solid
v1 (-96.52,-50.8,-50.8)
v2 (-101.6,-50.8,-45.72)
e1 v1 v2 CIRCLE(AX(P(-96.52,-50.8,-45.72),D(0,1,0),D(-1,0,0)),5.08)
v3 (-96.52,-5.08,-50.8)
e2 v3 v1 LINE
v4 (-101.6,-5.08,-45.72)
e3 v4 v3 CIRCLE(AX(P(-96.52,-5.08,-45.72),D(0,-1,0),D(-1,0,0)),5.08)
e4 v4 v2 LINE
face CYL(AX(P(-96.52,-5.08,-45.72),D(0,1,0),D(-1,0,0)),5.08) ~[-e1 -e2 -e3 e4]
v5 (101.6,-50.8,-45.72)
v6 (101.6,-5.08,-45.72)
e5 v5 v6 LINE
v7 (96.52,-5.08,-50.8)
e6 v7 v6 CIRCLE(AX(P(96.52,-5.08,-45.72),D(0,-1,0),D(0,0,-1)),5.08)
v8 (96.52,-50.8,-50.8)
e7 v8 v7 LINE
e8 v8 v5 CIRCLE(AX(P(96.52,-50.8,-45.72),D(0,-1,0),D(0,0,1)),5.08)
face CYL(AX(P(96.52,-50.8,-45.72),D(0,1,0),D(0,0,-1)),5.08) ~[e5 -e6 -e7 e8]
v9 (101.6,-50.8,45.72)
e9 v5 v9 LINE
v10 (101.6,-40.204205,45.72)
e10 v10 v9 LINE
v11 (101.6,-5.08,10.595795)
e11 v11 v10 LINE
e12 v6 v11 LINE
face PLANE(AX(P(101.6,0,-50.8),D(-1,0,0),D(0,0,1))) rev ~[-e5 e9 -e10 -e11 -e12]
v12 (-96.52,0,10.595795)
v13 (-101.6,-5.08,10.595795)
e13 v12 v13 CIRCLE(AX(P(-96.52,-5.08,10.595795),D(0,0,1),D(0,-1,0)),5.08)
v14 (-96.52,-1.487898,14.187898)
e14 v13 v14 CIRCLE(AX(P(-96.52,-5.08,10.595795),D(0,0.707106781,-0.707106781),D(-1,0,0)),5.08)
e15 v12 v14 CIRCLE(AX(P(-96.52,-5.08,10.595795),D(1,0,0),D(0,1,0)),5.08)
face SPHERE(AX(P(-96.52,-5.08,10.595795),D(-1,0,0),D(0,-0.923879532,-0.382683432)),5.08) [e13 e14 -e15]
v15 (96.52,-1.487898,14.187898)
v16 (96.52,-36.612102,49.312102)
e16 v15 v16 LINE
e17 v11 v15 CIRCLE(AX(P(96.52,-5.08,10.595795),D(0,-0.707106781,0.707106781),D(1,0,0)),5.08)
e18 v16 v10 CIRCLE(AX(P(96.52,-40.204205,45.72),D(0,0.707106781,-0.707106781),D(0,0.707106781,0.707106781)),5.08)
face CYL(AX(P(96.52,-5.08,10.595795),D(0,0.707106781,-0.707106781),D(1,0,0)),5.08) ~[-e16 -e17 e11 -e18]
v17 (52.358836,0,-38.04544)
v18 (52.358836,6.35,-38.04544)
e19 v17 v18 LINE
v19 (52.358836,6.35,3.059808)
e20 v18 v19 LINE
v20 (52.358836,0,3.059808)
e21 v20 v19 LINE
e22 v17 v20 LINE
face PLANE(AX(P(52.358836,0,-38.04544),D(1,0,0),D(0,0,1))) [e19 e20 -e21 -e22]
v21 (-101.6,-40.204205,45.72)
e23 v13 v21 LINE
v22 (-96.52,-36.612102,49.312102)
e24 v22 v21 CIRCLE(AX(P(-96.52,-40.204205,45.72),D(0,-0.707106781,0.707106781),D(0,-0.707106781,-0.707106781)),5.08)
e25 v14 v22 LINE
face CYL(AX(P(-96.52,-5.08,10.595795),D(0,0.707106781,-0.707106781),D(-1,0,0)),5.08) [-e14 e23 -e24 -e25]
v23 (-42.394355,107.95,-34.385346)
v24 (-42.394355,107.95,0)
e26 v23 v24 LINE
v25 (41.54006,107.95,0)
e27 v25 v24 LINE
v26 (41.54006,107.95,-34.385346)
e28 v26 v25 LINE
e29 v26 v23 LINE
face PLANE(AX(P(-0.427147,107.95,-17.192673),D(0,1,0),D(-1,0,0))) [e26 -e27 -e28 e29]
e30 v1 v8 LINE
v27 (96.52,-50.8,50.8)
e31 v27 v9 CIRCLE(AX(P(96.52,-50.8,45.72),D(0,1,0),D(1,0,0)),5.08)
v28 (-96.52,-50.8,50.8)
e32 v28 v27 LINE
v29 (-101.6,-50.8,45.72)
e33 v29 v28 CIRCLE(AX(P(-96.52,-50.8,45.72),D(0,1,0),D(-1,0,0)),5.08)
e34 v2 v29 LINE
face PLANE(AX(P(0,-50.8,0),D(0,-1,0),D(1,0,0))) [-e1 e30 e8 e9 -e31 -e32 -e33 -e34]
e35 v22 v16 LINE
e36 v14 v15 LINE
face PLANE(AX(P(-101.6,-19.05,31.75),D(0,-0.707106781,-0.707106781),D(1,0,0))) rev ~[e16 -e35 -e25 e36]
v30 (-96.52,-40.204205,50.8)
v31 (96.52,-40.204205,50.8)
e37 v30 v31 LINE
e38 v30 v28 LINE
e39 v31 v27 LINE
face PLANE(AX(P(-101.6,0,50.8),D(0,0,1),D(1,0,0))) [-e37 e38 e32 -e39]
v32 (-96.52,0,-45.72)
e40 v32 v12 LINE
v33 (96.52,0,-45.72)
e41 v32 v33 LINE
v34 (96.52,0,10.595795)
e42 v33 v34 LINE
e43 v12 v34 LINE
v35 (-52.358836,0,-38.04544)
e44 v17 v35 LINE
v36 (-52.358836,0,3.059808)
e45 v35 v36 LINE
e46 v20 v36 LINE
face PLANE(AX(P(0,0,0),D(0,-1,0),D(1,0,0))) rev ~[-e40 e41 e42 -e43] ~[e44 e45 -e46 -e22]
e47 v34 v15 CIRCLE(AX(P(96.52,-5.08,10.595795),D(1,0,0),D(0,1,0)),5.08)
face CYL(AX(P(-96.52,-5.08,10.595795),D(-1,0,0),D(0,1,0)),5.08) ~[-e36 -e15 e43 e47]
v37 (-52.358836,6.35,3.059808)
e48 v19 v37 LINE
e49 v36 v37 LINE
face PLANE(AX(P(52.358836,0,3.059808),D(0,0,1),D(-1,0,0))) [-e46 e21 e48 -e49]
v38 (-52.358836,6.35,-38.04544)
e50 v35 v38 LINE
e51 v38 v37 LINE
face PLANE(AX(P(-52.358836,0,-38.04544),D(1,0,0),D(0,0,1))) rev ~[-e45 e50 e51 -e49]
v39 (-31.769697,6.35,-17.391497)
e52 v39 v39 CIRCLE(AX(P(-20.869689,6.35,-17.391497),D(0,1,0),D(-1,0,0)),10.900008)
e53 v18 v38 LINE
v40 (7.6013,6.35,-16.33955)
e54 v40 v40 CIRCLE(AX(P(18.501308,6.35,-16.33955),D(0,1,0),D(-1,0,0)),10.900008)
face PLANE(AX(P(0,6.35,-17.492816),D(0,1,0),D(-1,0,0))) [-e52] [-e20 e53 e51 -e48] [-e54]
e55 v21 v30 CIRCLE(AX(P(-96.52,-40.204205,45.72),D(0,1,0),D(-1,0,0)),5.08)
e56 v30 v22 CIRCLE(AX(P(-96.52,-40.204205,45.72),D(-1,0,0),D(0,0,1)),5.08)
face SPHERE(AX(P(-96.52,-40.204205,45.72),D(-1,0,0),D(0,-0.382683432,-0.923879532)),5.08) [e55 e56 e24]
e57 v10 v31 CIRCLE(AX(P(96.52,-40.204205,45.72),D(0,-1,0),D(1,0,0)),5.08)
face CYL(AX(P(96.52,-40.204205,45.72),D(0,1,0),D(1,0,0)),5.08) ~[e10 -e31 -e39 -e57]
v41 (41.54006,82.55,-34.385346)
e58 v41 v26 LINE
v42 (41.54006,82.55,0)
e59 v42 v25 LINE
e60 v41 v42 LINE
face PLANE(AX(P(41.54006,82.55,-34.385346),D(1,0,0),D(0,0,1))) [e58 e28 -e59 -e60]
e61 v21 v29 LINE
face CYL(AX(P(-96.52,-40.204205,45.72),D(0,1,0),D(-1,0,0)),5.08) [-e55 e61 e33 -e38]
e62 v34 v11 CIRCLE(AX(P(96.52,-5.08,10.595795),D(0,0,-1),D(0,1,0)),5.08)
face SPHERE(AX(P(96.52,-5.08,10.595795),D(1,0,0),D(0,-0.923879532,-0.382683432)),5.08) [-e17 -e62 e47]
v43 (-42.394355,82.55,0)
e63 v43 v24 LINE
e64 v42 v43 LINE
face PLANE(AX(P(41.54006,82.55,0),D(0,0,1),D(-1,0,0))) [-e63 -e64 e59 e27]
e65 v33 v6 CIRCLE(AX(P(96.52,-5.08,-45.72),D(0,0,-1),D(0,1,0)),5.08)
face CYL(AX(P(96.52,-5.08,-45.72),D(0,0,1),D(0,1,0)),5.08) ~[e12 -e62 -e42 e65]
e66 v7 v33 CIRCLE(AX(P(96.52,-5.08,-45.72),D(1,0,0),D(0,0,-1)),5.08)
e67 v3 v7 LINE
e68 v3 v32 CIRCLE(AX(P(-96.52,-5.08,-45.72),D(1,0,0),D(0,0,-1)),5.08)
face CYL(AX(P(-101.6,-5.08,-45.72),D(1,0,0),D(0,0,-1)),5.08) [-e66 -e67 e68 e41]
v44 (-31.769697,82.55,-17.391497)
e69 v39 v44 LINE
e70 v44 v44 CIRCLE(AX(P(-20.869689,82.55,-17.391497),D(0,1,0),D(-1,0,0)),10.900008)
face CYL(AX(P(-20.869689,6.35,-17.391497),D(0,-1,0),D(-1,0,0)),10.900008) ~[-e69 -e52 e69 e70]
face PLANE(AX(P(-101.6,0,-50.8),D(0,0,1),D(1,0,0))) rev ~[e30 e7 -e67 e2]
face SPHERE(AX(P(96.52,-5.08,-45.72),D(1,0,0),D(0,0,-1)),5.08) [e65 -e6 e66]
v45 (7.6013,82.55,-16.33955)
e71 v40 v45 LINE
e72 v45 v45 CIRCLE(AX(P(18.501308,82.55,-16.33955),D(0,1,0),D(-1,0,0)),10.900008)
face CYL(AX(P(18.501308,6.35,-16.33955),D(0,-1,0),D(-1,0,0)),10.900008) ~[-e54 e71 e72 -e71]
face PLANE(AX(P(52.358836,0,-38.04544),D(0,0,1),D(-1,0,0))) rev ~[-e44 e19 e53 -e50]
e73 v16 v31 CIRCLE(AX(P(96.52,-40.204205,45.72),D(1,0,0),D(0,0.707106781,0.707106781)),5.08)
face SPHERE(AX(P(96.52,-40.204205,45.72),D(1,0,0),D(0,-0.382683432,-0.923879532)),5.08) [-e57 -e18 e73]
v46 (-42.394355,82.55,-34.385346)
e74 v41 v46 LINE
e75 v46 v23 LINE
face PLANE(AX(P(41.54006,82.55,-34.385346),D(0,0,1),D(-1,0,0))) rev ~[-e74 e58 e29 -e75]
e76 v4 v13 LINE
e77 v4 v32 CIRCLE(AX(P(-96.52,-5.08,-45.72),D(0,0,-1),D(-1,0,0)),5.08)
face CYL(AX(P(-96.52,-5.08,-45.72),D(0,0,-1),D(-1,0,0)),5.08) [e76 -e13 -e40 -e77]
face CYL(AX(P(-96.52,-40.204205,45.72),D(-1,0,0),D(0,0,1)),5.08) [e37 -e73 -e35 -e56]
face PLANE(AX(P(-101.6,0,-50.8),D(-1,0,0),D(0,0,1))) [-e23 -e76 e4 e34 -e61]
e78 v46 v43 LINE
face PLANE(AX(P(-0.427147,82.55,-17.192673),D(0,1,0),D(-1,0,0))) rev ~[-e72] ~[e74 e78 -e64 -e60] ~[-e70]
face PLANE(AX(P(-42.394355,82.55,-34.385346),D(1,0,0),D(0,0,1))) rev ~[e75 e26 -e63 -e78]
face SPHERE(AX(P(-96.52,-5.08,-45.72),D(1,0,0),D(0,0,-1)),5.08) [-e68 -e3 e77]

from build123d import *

# Parameters (mm, degrees)
F0_W         = 203.2
F0_H         = 101.6
F1_DEPTH     = 50.8
F2_R         = 5.08
F3_SIZE      = 38.1
F4_T1_DEPTH  = 71.12
F4_T3_DEPTH  = 58.42
F4_T6_ANGLE  = 90
F5_R         = 5.08
F6_T1_DEPTH  = 64.4773318296
F6_T3_DEPTH  = 193.04
F6_T8_DEPTH  = 5.08
F6_T14_DEPTH = 5.08
F7_T1_DEPTH  = 193.04
F7_T3_DEPTH  = 23.2957951031
F7_T8_DEPTH  = 5.08
F7_T14_DEPTH = 5.08
F8_W         = 104.7176718712
F8_H         = 41.105248034
F9_DEPTH     = 6.35
F10_R        = 10.900008085
F11_DEPTH    = 76.2
F12_W        = 83.9344151318
F12_H        = 34.3853458762
F13_DEPTH    = 25.4


# Not quite as in the source:
# - a fillet or chamfer that OpenCascade refuses, or shapes differently, is made with other operations: its cross-section is extruded or revolved along the edge and cut away or added


with BuildPart() as f1:
    # F0 (on Front) → F1 (new body)
    with BuildSketch(Plane.XZ):
        Rectangle(F0_W, F0_H)
    extrude(amount=F1_DEPTH)

    # F2
    f2_edges = [f1.edges().sort_by_distance(p)[0] for p in [
        (0, 0, -50.8),
    ]]
    fillet(f2_edges, radius=F2_R)

    # F3
    f3_edges = [f1.edges().sort_by_distance(p)[0] for p in [
        (0, 0, 50.8),
    ]]
    chamfer(f3_edges, length=F3_SIZE)

    # F4: fillet of radius 5.08 on 1 edges, made by hand

    # F4_s2 → F4_t1 (cut)
    with BuildSketch(Plane.XY.offset(-45.72)):
        with BuildLine():
            ThreePointArc((-101.6, -5.08), (-100.1121024484, -1.4878975516), (-96.52, 0))
            Line((-96.52, 0), (-101.6, 0))
            Line((-101.6, 0), (-101.6, -5.08))
        make_face()
    extrude(amount=F4_T1_DEPTH, mode=Mode.SUBTRACT)

    # F4_s4 → F4_t3 (cut)
    with BuildSketch(Plane.XZ.offset(5.08)):
        with BuildLine():
            ThreePointArc((-101.6, -45.72), (-100.1121024484, -49.3121024484), (-96.52, -50.8))
            Line((-96.52, -50.8), (-101.6, -50.8))
            Line((-101.6, -50.8), (-101.6, -45.72))
        make_face()
    extrude(amount=F4_T3_DEPTH, mode=Mode.SUBTRACT)

    # F4_s5 → F4_t6 (revolve, cut)
    with BuildSketch(Plane.XZ.offset(5.08)):
        with BuildLine():
            ThreePointArc((-101.6, -45.72), (-100.1121024484, -49.3121024484), (-96.52, -50.8))
            Line((-96.52, -50.8), (-101.6, -50.8))
            Line((-101.6, -50.8), (-101.6, -45.72))
        make_face()
    revolve(axis=Axis((-101.6, -5.08, -45.72), (1, 0, 0)), revolution_arc=F4_T6_ANGLE, mode=Mode.SUBTRACT)

    # F5
    f5_edges = [f1.edges().sort_by_distance(p)[0] for p in [
        (101.6, 0, -16.51),
    ]]
    fillet(f5_edges, radius=F5_R)

    # F6: fillet of radius 5.08 on 1 edges, made by hand

    # F6_s2 → F6_t1 (cut)
    with BuildSketch(Plane(origin=(0, -7.8378975516, 7.8378975516), x_dir=(1, 0, 0), z_dir=(0, -0.7071067812, 0.7071067812))):
        with BuildLine():
            ThreePointArc((101.6, 3.9002561211), (100.1121024484, 7.4923585695), (96.52, 8.9802561211))
            Line((96.52, 8.9802561211), (101.6, 8.9802561211))
            Line((101.6, 8.9802561211), (101.6, 3.9002561211))
        make_face()
        with BuildLine():
            ThreePointArc((-101.6, 3.9002561211), (-100.1121024484, 7.4923585695), (-96.52, 8.9802561211))
            Line((-96.52, 8.9802561211), (-101.6, 8.9802561211))
            Line((-101.6, 8.9802561211), (-101.6, 3.9002561211))
        make_face()
    extrude(amount=F6_T1_DEPTH, mode=Mode.SUBTRACT)

    # F6_s4 → F6_t3 (cut)
    with BuildSketch(Plane.YZ.offset(-96.52)):
        with BuildLine():
            ThreePointArc((0, 10.5957951031), (-0.3866919748, 12.5398269396), (-1.4878975516, 14.1878975516))
            Line((-1.4878975516, 14.1878975516), (0, 12.7))
            Line((0, 12.7), (0, 10.5957951031))
        make_face()
    extrude(amount=F6_T3_DEPTH, mode=Mode.SUBTRACT)


with BuildPart() as f6_tool6:
    # F6_s7 → F6_t8 (new body)
    with BuildSketch(Plane.YZ.offset(96.52)):
        Polygon((-5.08, 10.5957951031), (-1.4878975516, 14.1878975516), (0, 12.7), (0, 10.5957951031), align=None)
    extrude(amount=F6_T8_DEPTH)

    # F6_s9 → F6_t10 (revolve, cut)
    with BuildSketch(Plane(origin=(96.52, -5.08, 10.5957951031), x_dir=(0, -0.9238795325, -0.3826834324), z_dir=(0, -0.3826834324, 0.9238795325))):
        with BuildLine():
            ThreePointArc((0, -5.08), (5.08, 0), (0, 5.08))
            Line((0, 5.08), (0, -5.08))
        make_face()
    revolve(axis=Axis((96.52, -5.08, 10.5957951031), (1, 0, 0)), mode=Mode.SUBTRACT)


with BuildPart() as f1_1:
    add(f1.part)

    # F6_t5: cut F6_tool6
    add(f6_tool6.part, mode=Mode.SUBTRACT)


with BuildPart() as f6_tool12:
    # F6_s13 → F6_t14 (new body)
    with BuildSketch(Plane.YZ.offset(-96.52)):
        Polygon((-5.08, 10.5957951031), (-1.4878975516, 14.1878975516), (0, 12.7), (0, 10.5957951031), align=None)
    extrude(amount=-F6_T14_DEPTH)

    # F6_s15 → F6_t16 (revolve, cut)
    with BuildSketch(Plane(origin=(-96.52, -5.08, 10.5957951031), x_dir=(0, -0.9238795325, -0.3826834324), z_dir=(0, 0.3826834324, -0.9238795325))):
        with BuildLine():
            ThreePointArc((0, -5.08), (5.08, 0), (0, 5.08))
            Line((0, 5.08), (0, -5.08))
        make_face()
    revolve(axis=Axis((-96.52, -5.08, 10.5957951031), (-1, 0, 0)), mode=Mode.SUBTRACT)


with BuildPart() as f1_2:
    add(f1_1.part)

    # F6_t11: cut F6_tool12
    add(f6_tool12.part, mode=Mode.SUBTRACT)

    # F7: fillet of radius 5.08 on 3 edges, made by hand

    # F7_s2 → F7_t1 (cut)
    with BuildSketch(Plane.YZ.offset(-96.52)):
        with BuildLine():
            ThreePointArc((-40.2042048969, 50.8), (-38.2601730604, 50.4133080252), (-36.6121024484, 49.3121024484))
            Line((-36.6121024484, 49.3121024484), (-38.1, 50.8))
            Line((-38.1, 50.8), (-40.2042048969, 50.8))
        make_face()
    extrude(amount=F7_T1_DEPTH, mode=Mode.SUBTRACT)

    # F7_s4 → F7_t3 (cut)
    with BuildSketch(Plane.XZ.offset(40.2042048969)):
        with BuildLine():
            ThreePointArc((101.6, 45.72), (100.1121024484, 49.3121024484), (96.52, 50.8))
            Line((96.52, 50.8), (101.6, 50.8))
            Line((101.6, 50.8), (101.6, 45.72))
        make_face()
        with BuildLine():
            ThreePointArc((-101.6, 45.72), (-100.1121024484, 49.3121024484), (-96.52, 50.8))
            Line((-96.52, 50.8), (-101.6, 50.8))
            Line((-101.6, 50.8), (-101.6, 45.72))
        make_face()
    extrude(amount=F7_T3_DEPTH, mode=Mode.SUBTRACT)


with BuildPart() as f7_tool6:
    # F7_s7 → F7_t8 (new body)
    with BuildSketch(Plane.YZ.offset(-96.52)):
        Polygon((-40.2042048969, 45.72), (-40.2042048969, 50.8), (-38.1, 50.8), (-36.6121024484, 49.3121024484), align=None)
    extrude(amount=-F7_T8_DEPTH)

    # F7_s9 → F7_t10 (revolve, cut)
    with BuildSketch(Plane(origin=(-96.52, -40.2042048969, 45.72), x_dir=(0, -0.3826834324, -0.9238795325), z_dir=(0, 0.9238795325, -0.3826834324))):
        with BuildLine():
            ThreePointArc((0, -5.08), (5.08, 0), (0, 5.08))
            Line((0, 5.08), (0, -5.08))
        make_face()
    revolve(axis=Axis((-96.52, -40.2042048969, 45.72), (-1, 0, 0)), mode=Mode.SUBTRACT)


with BuildPart() as f1_3:
    add(f1_2.part)

    # F7_t5: cut F7_tool6
    add(f7_tool6.part, mode=Mode.SUBTRACT)


with BuildPart() as f7_tool12:
    # F7_s13 → F7_t14 (new body)
    with BuildSketch(Plane.YZ.offset(96.52)):
        Polygon((-40.2042048969, 45.72), (-40.2042048969, 50.8), (-38.1, 50.8), (-36.6121024484, 49.3121024484), align=None)
    extrude(amount=F7_T14_DEPTH)

    # F7_s15 → F7_t16 (revolve, cut)
    with BuildSketch(Plane(origin=(96.52, -40.2042048969, 45.72), x_dir=(0, -0.3826834324, -0.9238795325), z_dir=(0, -0.9238795325, 0.3826834324))):
        with BuildLine():
            ThreePointArc((0, -5.08), (5.08, 0), (0, 5.08))
            Line((0, 5.08), (0, -5.08))
        make_face()
    revolve(axis=Axis((96.52, -40.2042048969, 45.72), (1, 0, 0)), mode=Mode.SUBTRACT)


with BuildPart() as f1_4:
    add(f1_3.part)

    # F7_t11: cut F7_tool12
    add(f7_tool12.part, mode=Mode.SUBTRACT)

    # F8 (on face) → F9 (join)
    with BuildSketch(Plane(origin=(0, 0, 0), x_dir=(-1, 0, 0), z_dir=(0, 1, 0))):
        with Locations((0, -17.4928158522)):
            Rectangle(F8_W, F8_H)
    extrude(amount=F9_DEPTH)

    # F10 (on face) → F11 (join)
    with BuildSketch(Plane(origin=(0, 6.35, 0), x_dir=(-1, 0, 0), z_dir=(0, 1, 0))):
        with Locations((-18.5013078153, -16.3395497948)):
            Circle(F10_R)
        with Locations((20.8696890622, -17.3914972693)):
            Circle(F10_R)
    extrude(amount=F11_DEPTH)

    # F12 (on face) → F13 (join)
    with BuildSketch(Plane(origin=(0, 82.55, 0), x_dir=(-1, 0, 0), z_dir=(0, 1, 0))):
        with Locations((0.4271473736, -17.1926729381)):
            Rectangle(F12_W, F12_H)
    extrude(amount=F13_DEPTH)


solid = f1_4.part
